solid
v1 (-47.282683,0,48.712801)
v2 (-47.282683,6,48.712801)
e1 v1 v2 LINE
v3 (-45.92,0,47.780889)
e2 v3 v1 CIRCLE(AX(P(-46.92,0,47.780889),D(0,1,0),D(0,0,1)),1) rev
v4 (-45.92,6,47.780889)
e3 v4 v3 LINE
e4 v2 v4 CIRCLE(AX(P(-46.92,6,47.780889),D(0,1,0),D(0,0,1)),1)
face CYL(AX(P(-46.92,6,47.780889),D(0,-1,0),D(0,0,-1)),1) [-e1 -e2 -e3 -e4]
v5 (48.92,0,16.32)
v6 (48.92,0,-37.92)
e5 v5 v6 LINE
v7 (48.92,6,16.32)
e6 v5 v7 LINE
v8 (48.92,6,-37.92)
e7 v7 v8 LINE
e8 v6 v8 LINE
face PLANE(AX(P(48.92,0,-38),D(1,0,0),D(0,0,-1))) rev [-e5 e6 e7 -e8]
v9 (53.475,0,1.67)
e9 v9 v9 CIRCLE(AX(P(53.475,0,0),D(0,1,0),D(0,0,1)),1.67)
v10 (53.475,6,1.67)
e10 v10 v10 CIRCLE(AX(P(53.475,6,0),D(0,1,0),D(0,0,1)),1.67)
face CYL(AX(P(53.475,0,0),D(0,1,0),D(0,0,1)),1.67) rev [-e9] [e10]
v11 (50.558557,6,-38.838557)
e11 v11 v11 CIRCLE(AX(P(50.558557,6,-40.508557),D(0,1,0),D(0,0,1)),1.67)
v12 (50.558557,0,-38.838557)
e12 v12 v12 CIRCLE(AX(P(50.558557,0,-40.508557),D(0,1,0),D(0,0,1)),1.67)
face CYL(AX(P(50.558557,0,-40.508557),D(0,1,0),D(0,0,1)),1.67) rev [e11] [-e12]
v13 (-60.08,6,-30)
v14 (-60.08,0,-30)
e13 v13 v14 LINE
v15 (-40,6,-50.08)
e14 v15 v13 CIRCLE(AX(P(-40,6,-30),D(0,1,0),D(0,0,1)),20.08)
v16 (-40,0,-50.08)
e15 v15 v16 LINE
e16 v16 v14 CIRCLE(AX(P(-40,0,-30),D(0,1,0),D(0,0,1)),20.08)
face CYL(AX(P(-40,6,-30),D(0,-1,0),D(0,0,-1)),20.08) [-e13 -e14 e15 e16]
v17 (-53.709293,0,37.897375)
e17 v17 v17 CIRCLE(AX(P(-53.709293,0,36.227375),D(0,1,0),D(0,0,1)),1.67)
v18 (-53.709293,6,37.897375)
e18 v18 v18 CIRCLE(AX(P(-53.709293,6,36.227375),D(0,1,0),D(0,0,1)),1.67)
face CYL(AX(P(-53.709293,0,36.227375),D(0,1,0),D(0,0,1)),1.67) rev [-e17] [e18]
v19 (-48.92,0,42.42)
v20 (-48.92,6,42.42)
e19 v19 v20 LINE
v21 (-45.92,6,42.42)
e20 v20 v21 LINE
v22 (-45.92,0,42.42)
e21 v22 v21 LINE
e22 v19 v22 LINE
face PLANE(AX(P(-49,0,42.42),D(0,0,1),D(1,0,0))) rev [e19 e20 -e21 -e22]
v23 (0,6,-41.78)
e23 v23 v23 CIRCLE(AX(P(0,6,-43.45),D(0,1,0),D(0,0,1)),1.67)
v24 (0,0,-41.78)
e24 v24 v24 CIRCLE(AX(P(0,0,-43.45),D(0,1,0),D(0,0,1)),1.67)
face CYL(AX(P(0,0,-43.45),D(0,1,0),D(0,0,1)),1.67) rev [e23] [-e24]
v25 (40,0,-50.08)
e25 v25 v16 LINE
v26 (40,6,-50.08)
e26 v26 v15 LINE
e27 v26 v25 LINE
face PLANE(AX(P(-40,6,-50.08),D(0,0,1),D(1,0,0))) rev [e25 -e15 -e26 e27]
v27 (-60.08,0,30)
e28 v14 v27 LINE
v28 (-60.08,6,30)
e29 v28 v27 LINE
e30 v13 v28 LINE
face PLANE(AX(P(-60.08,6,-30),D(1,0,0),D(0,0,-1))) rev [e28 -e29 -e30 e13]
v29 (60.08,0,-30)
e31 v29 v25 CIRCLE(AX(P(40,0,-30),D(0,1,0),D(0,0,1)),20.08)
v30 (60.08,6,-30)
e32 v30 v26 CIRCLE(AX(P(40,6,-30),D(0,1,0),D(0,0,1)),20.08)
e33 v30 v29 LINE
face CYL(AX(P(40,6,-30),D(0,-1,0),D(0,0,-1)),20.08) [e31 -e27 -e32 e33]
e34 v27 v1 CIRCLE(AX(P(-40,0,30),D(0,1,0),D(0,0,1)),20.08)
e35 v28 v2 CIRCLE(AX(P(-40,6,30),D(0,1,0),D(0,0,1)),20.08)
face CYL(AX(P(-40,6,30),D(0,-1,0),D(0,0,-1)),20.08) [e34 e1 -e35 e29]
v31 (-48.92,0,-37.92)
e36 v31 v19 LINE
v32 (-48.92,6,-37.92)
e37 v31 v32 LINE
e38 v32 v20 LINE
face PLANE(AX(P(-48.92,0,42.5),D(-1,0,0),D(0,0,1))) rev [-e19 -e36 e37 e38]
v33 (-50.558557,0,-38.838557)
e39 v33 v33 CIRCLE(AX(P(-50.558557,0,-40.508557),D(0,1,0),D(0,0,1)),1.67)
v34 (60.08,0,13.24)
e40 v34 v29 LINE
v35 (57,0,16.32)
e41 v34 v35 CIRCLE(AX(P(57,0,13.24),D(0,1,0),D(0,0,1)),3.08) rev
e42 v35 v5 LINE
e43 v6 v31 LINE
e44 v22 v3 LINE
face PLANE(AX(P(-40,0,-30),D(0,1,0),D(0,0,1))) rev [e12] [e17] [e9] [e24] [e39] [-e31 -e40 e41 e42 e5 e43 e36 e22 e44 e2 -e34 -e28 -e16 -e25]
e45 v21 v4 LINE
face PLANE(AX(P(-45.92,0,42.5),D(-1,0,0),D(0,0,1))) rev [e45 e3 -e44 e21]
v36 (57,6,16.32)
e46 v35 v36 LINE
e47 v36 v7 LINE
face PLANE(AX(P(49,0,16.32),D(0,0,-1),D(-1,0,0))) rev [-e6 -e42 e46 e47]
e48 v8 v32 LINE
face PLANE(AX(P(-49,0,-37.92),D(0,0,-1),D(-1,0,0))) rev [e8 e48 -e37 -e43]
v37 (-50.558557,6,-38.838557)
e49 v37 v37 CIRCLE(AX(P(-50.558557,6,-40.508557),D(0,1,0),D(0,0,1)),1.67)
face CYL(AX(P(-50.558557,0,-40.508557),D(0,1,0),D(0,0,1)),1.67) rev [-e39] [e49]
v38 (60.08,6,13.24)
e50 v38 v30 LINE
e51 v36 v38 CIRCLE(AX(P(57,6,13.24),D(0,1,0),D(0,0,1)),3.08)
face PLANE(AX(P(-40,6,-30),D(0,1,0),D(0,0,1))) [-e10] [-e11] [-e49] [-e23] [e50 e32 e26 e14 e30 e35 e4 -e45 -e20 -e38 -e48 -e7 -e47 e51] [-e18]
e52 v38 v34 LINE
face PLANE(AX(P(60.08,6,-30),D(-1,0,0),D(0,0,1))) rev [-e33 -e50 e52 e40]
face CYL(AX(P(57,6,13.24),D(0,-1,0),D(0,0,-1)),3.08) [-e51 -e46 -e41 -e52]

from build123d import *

# Parameters (mm, degrees)
BOSS_EXTRUDE1_DEPTH    = 6
CUT_EXTRUDE1_DEPTH     = 79.33262411
SKETCH3_W              = 25
SKETCH3_H              = 31.620571099
CUT_EXTRUDE2_DEPTH     = 79.33262411
FILLET1_R              = 3
SKETCH4_R              = 1.75
CUT_EXTRUDE3_DEPTH     = 79.33262411
MOVE_FACE1_OUTLINE_R   = 1.75
MOVE_FACE1_OUTLINE_R_2 = 1.67
MOVE_FACE1_DEPTH       = 6
FILLET2_R              = 1


# Read off the part's stored shape, not the designer's step: Move Face1
with BuildPart() as part:
    # Sketch1 → Boss-Extrude1 (new body)
    with BuildSketch(Plane(origin=(0, 0, 0), x_dir=(1, 0, 0), z_dir=(0, 1, 0))):
        with BuildLine():
            Line((-60, 30), (-60, -30))
            ThreePointArc((-60, -30), (-54.142135624, -44.142135624), (-40, -50))
            Line((-40, -50), (40, -50))
            ThreePointArc((40, -50), (54.142135624, -44.142135624), (60, -30))
            Line((60, -30), (60, 30))
            ThreePointArc((60, 30), (54.142135624, 44.142135624), (40, 50))
            Line((40, 50), (-40, 50))
            ThreePointArc((-40, 50), (-54.142135624, 44.142135624), (-60, 30))
        make_face()
    extrude(amount=BOSS_EXTRUDE1_DEPTH)

    # Sketch2 → Cut-Extrude1 (cut, through all)
    with BuildSketch(Plane(origin=(0, 6, 0), x_dir=(1, 0, 0), z_dir=(0, 1, 0))):
        Polygon((-49, 38), (49, 38), (49, -50), (-46, -50), (-46, -42.5), (-49, -42.5), align=None)
    extrude(amount=-CUT_EXTRUDE1_DEPTH, mode=Mode.SUBTRACT)

    # Sketch3 → Cut-Extrude2 (cut, through all)
    with BuildSketch(Plane(origin=(0, 6, 0), x_dir=(1, 0, 0), z_dir=(0, 1, 0))):
        with Locations((61.5, -32.05028555)):
            Rectangle(SKETCH3_W, SKETCH3_H)
    extrude(amount=-CUT_EXTRUDE2_DEPTH, mode=Mode.SUBTRACT)

    # Fillet1
    fillet1_edges = [part.edges().sort_by_distance(p)[0] for p in [
        (60, 3, 16.24),
    ]]
    fillet(fillet1_edges, radius=FILLET1_R)

    # Sketch4 → Cut-Extrude3 (cut, through all)
    with BuildSketch(Plane(origin=(0, 6, 0), x_dir=(1, 0, 0), z_dir=(0, 1, 0))):
        with Locations(Location((53.475, 0, 0), (0, 0, 270))):
            Circle(SKETCH4_R)
        with Locations(Location((-53.709292606, -36.227375296, 0), (0, 0, 270))):
            Circle(SKETCH4_R)
        with Locations(Location((0, 43.45, 0), (0, 0, 270))):
            Circle(SKETCH4_R)
        with Locations(Location((50.558556763, 40.508556763, 0), (0, 0, 270))):
            Circle(SKETCH4_R)
        with Locations(Location((-50.558556763, 40.508556763, 0), (0, 0, 90))):
            Circle(SKETCH4_R)
    extrude(amount=-CUT_EXTRUDE3_DEPTH, mode=Mode.SUBTRACT)

    # Move Face1 outline → Move Face1 (add)
    # profile 1 of 6: a face of its own
    with BuildSketch(Plane(origin=(0, 0, 0), x_dir=(1, 0, 0), z_dir=(0, 1, 0))):
        with BuildLine():
            ThreePointArc((-40, 50.08), (-54.198704166, 44.198704166), (-60.08, 30))
            Line((-60.08, 30), (-60.08, -30))
            ThreePointArc((-60.08, -30), (-56.156732343, -41.923355232), (-45.92, -49.187495928))
            Line((-45.92, -49.187495928), (-45.92, -42.42))
            Line((-45.92, -42.42), (-48.92, -42.42))
            Line((-48.92, -42.42), (-48.92, 37.92))
            Line((-48.92, 37.92), (48.92, 37.92))
            Line((48.92, 37.92), (48.92, -16.32))
            Line((48.92, -16.32), (57, -16.32))
            ThreePointArc((57, -16.32), (59.177888886, -15.417888886), (60.08, -13.24))
            Line((60.08, -13.24), (60.08, 30))
            ThreePointArc((60.08, 30), (54.198704166, 44.198704166), (40, 50.08))
            Line((40, 50.08), (-40, 50.08))
        make_face()
        with BuildLine():
            Line((-60, -30), (-60, 30))
            ThreePointArc((-60, 30), (-54.142135624, 44.142135624), (-40, 50))
            Line((-40, 50), (40, 50))
            ThreePointArc((40, 50), (54.142135624, 44.142135624), (60, 30))
            Line((60, 30), (60, -13.24))
            ThreePointArc((60, -13.24), (59.121320344, -15.361320344), (57, -16.24))
            Line((57, -16.24), (49, -16.24))
            Line((49, -16.24), (49, 38))
            Line((49, 38), (-49, 38))
            Line((-49, 38), (-49, -42.5))
            Line((-49, -42.5), (-46, -42.5))
            Line((-46, -42.5), (-46, -49.078784028))
            ThreePointArc((-46, -49.078784028), (-56.124515497, -41.832159566), (-60, -30))
        make_face(mode=Mode.SUBTRACT)
    # profile 2 of 6: a face of its own
    with BuildSketch(Plane(origin=(0, 0, 0), x_dir=(1, 0, 0), z_dir=(0, 1, 0))):
        with Locations((53.475, 0)):
            Circle(MOVE_FACE1_OUTLINE_R)
        with Locations((53.475, 0)):
            Circle(MOVE_FACE1_OUTLINE_R_2, mode=Mode.SUBTRACT)
    # profile 3 of 6: a face of its own
    with BuildSketch(Plane(origin=(0, 0, 0), x_dir=(1, 0, 0), z_dir=(0, 1, 0))):
        with Locations((0, 43.45)):
            Circle(MOVE_FACE1_OUTLINE_R)
        with Locations((0, 43.45)):
            Circle(MOVE_FACE1_OUTLINE_R_2, mode=Mode.SUBTRACT)
    # profile 4 of 6: a face of its own
    with BuildSketch(Plane(origin=(0, 0, 0), x_dir=(1, 0, 0), z_dir=(0, 1, 0))):
        with Locations((50.558556763, 40.508556763)):
            Circle(MOVE_FACE1_OUTLINE_R)
        with Locations((50.558556763, 40.508556763)):
            Circle(MOVE_FACE1_OUTLINE_R_2, mode=Mode.SUBTRACT)
    # profile 5 of 6: a face of its own
    with BuildSketch(Plane(origin=(0, 0, 0), x_dir=(1, 0, 0), z_dir=(0, 1, 0))):
        with Locations((-50.558556763, 40.508556763)):
            Circle(MOVE_FACE1_OUTLINE_R)
        with Locations((-50.558556763, 40.508556763)):
            Circle(MOVE_FACE1_OUTLINE_R_2, mode=Mode.SUBTRACT)
    # profile 6 of 6: a face of its own
    with BuildSketch(Plane(origin=(0, 0, 0), x_dir=(1, 0, 0), z_dir=(0, 1, 0))):
        with Locations((-53.709292606, -36.227375296)):
            Circle(MOVE_FACE1_OUTLINE_R)
        with Locations((-53.709292606, -36.227375296)):
            Circle(MOVE_FACE1_OUTLINE_R_2, mode=Mode.SUBTRACT)
    extrude(amount=MOVE_FACE1_DEPTH)

    # Fillet2
    fillet2_edges = [part.edges().sort_by_distance(p)[0] for p in [
        (-45.92, 3, 49.187495928),
    ]]
    fillet(fillet2_edges, radius=FILLET2_R)


solid = part.part
